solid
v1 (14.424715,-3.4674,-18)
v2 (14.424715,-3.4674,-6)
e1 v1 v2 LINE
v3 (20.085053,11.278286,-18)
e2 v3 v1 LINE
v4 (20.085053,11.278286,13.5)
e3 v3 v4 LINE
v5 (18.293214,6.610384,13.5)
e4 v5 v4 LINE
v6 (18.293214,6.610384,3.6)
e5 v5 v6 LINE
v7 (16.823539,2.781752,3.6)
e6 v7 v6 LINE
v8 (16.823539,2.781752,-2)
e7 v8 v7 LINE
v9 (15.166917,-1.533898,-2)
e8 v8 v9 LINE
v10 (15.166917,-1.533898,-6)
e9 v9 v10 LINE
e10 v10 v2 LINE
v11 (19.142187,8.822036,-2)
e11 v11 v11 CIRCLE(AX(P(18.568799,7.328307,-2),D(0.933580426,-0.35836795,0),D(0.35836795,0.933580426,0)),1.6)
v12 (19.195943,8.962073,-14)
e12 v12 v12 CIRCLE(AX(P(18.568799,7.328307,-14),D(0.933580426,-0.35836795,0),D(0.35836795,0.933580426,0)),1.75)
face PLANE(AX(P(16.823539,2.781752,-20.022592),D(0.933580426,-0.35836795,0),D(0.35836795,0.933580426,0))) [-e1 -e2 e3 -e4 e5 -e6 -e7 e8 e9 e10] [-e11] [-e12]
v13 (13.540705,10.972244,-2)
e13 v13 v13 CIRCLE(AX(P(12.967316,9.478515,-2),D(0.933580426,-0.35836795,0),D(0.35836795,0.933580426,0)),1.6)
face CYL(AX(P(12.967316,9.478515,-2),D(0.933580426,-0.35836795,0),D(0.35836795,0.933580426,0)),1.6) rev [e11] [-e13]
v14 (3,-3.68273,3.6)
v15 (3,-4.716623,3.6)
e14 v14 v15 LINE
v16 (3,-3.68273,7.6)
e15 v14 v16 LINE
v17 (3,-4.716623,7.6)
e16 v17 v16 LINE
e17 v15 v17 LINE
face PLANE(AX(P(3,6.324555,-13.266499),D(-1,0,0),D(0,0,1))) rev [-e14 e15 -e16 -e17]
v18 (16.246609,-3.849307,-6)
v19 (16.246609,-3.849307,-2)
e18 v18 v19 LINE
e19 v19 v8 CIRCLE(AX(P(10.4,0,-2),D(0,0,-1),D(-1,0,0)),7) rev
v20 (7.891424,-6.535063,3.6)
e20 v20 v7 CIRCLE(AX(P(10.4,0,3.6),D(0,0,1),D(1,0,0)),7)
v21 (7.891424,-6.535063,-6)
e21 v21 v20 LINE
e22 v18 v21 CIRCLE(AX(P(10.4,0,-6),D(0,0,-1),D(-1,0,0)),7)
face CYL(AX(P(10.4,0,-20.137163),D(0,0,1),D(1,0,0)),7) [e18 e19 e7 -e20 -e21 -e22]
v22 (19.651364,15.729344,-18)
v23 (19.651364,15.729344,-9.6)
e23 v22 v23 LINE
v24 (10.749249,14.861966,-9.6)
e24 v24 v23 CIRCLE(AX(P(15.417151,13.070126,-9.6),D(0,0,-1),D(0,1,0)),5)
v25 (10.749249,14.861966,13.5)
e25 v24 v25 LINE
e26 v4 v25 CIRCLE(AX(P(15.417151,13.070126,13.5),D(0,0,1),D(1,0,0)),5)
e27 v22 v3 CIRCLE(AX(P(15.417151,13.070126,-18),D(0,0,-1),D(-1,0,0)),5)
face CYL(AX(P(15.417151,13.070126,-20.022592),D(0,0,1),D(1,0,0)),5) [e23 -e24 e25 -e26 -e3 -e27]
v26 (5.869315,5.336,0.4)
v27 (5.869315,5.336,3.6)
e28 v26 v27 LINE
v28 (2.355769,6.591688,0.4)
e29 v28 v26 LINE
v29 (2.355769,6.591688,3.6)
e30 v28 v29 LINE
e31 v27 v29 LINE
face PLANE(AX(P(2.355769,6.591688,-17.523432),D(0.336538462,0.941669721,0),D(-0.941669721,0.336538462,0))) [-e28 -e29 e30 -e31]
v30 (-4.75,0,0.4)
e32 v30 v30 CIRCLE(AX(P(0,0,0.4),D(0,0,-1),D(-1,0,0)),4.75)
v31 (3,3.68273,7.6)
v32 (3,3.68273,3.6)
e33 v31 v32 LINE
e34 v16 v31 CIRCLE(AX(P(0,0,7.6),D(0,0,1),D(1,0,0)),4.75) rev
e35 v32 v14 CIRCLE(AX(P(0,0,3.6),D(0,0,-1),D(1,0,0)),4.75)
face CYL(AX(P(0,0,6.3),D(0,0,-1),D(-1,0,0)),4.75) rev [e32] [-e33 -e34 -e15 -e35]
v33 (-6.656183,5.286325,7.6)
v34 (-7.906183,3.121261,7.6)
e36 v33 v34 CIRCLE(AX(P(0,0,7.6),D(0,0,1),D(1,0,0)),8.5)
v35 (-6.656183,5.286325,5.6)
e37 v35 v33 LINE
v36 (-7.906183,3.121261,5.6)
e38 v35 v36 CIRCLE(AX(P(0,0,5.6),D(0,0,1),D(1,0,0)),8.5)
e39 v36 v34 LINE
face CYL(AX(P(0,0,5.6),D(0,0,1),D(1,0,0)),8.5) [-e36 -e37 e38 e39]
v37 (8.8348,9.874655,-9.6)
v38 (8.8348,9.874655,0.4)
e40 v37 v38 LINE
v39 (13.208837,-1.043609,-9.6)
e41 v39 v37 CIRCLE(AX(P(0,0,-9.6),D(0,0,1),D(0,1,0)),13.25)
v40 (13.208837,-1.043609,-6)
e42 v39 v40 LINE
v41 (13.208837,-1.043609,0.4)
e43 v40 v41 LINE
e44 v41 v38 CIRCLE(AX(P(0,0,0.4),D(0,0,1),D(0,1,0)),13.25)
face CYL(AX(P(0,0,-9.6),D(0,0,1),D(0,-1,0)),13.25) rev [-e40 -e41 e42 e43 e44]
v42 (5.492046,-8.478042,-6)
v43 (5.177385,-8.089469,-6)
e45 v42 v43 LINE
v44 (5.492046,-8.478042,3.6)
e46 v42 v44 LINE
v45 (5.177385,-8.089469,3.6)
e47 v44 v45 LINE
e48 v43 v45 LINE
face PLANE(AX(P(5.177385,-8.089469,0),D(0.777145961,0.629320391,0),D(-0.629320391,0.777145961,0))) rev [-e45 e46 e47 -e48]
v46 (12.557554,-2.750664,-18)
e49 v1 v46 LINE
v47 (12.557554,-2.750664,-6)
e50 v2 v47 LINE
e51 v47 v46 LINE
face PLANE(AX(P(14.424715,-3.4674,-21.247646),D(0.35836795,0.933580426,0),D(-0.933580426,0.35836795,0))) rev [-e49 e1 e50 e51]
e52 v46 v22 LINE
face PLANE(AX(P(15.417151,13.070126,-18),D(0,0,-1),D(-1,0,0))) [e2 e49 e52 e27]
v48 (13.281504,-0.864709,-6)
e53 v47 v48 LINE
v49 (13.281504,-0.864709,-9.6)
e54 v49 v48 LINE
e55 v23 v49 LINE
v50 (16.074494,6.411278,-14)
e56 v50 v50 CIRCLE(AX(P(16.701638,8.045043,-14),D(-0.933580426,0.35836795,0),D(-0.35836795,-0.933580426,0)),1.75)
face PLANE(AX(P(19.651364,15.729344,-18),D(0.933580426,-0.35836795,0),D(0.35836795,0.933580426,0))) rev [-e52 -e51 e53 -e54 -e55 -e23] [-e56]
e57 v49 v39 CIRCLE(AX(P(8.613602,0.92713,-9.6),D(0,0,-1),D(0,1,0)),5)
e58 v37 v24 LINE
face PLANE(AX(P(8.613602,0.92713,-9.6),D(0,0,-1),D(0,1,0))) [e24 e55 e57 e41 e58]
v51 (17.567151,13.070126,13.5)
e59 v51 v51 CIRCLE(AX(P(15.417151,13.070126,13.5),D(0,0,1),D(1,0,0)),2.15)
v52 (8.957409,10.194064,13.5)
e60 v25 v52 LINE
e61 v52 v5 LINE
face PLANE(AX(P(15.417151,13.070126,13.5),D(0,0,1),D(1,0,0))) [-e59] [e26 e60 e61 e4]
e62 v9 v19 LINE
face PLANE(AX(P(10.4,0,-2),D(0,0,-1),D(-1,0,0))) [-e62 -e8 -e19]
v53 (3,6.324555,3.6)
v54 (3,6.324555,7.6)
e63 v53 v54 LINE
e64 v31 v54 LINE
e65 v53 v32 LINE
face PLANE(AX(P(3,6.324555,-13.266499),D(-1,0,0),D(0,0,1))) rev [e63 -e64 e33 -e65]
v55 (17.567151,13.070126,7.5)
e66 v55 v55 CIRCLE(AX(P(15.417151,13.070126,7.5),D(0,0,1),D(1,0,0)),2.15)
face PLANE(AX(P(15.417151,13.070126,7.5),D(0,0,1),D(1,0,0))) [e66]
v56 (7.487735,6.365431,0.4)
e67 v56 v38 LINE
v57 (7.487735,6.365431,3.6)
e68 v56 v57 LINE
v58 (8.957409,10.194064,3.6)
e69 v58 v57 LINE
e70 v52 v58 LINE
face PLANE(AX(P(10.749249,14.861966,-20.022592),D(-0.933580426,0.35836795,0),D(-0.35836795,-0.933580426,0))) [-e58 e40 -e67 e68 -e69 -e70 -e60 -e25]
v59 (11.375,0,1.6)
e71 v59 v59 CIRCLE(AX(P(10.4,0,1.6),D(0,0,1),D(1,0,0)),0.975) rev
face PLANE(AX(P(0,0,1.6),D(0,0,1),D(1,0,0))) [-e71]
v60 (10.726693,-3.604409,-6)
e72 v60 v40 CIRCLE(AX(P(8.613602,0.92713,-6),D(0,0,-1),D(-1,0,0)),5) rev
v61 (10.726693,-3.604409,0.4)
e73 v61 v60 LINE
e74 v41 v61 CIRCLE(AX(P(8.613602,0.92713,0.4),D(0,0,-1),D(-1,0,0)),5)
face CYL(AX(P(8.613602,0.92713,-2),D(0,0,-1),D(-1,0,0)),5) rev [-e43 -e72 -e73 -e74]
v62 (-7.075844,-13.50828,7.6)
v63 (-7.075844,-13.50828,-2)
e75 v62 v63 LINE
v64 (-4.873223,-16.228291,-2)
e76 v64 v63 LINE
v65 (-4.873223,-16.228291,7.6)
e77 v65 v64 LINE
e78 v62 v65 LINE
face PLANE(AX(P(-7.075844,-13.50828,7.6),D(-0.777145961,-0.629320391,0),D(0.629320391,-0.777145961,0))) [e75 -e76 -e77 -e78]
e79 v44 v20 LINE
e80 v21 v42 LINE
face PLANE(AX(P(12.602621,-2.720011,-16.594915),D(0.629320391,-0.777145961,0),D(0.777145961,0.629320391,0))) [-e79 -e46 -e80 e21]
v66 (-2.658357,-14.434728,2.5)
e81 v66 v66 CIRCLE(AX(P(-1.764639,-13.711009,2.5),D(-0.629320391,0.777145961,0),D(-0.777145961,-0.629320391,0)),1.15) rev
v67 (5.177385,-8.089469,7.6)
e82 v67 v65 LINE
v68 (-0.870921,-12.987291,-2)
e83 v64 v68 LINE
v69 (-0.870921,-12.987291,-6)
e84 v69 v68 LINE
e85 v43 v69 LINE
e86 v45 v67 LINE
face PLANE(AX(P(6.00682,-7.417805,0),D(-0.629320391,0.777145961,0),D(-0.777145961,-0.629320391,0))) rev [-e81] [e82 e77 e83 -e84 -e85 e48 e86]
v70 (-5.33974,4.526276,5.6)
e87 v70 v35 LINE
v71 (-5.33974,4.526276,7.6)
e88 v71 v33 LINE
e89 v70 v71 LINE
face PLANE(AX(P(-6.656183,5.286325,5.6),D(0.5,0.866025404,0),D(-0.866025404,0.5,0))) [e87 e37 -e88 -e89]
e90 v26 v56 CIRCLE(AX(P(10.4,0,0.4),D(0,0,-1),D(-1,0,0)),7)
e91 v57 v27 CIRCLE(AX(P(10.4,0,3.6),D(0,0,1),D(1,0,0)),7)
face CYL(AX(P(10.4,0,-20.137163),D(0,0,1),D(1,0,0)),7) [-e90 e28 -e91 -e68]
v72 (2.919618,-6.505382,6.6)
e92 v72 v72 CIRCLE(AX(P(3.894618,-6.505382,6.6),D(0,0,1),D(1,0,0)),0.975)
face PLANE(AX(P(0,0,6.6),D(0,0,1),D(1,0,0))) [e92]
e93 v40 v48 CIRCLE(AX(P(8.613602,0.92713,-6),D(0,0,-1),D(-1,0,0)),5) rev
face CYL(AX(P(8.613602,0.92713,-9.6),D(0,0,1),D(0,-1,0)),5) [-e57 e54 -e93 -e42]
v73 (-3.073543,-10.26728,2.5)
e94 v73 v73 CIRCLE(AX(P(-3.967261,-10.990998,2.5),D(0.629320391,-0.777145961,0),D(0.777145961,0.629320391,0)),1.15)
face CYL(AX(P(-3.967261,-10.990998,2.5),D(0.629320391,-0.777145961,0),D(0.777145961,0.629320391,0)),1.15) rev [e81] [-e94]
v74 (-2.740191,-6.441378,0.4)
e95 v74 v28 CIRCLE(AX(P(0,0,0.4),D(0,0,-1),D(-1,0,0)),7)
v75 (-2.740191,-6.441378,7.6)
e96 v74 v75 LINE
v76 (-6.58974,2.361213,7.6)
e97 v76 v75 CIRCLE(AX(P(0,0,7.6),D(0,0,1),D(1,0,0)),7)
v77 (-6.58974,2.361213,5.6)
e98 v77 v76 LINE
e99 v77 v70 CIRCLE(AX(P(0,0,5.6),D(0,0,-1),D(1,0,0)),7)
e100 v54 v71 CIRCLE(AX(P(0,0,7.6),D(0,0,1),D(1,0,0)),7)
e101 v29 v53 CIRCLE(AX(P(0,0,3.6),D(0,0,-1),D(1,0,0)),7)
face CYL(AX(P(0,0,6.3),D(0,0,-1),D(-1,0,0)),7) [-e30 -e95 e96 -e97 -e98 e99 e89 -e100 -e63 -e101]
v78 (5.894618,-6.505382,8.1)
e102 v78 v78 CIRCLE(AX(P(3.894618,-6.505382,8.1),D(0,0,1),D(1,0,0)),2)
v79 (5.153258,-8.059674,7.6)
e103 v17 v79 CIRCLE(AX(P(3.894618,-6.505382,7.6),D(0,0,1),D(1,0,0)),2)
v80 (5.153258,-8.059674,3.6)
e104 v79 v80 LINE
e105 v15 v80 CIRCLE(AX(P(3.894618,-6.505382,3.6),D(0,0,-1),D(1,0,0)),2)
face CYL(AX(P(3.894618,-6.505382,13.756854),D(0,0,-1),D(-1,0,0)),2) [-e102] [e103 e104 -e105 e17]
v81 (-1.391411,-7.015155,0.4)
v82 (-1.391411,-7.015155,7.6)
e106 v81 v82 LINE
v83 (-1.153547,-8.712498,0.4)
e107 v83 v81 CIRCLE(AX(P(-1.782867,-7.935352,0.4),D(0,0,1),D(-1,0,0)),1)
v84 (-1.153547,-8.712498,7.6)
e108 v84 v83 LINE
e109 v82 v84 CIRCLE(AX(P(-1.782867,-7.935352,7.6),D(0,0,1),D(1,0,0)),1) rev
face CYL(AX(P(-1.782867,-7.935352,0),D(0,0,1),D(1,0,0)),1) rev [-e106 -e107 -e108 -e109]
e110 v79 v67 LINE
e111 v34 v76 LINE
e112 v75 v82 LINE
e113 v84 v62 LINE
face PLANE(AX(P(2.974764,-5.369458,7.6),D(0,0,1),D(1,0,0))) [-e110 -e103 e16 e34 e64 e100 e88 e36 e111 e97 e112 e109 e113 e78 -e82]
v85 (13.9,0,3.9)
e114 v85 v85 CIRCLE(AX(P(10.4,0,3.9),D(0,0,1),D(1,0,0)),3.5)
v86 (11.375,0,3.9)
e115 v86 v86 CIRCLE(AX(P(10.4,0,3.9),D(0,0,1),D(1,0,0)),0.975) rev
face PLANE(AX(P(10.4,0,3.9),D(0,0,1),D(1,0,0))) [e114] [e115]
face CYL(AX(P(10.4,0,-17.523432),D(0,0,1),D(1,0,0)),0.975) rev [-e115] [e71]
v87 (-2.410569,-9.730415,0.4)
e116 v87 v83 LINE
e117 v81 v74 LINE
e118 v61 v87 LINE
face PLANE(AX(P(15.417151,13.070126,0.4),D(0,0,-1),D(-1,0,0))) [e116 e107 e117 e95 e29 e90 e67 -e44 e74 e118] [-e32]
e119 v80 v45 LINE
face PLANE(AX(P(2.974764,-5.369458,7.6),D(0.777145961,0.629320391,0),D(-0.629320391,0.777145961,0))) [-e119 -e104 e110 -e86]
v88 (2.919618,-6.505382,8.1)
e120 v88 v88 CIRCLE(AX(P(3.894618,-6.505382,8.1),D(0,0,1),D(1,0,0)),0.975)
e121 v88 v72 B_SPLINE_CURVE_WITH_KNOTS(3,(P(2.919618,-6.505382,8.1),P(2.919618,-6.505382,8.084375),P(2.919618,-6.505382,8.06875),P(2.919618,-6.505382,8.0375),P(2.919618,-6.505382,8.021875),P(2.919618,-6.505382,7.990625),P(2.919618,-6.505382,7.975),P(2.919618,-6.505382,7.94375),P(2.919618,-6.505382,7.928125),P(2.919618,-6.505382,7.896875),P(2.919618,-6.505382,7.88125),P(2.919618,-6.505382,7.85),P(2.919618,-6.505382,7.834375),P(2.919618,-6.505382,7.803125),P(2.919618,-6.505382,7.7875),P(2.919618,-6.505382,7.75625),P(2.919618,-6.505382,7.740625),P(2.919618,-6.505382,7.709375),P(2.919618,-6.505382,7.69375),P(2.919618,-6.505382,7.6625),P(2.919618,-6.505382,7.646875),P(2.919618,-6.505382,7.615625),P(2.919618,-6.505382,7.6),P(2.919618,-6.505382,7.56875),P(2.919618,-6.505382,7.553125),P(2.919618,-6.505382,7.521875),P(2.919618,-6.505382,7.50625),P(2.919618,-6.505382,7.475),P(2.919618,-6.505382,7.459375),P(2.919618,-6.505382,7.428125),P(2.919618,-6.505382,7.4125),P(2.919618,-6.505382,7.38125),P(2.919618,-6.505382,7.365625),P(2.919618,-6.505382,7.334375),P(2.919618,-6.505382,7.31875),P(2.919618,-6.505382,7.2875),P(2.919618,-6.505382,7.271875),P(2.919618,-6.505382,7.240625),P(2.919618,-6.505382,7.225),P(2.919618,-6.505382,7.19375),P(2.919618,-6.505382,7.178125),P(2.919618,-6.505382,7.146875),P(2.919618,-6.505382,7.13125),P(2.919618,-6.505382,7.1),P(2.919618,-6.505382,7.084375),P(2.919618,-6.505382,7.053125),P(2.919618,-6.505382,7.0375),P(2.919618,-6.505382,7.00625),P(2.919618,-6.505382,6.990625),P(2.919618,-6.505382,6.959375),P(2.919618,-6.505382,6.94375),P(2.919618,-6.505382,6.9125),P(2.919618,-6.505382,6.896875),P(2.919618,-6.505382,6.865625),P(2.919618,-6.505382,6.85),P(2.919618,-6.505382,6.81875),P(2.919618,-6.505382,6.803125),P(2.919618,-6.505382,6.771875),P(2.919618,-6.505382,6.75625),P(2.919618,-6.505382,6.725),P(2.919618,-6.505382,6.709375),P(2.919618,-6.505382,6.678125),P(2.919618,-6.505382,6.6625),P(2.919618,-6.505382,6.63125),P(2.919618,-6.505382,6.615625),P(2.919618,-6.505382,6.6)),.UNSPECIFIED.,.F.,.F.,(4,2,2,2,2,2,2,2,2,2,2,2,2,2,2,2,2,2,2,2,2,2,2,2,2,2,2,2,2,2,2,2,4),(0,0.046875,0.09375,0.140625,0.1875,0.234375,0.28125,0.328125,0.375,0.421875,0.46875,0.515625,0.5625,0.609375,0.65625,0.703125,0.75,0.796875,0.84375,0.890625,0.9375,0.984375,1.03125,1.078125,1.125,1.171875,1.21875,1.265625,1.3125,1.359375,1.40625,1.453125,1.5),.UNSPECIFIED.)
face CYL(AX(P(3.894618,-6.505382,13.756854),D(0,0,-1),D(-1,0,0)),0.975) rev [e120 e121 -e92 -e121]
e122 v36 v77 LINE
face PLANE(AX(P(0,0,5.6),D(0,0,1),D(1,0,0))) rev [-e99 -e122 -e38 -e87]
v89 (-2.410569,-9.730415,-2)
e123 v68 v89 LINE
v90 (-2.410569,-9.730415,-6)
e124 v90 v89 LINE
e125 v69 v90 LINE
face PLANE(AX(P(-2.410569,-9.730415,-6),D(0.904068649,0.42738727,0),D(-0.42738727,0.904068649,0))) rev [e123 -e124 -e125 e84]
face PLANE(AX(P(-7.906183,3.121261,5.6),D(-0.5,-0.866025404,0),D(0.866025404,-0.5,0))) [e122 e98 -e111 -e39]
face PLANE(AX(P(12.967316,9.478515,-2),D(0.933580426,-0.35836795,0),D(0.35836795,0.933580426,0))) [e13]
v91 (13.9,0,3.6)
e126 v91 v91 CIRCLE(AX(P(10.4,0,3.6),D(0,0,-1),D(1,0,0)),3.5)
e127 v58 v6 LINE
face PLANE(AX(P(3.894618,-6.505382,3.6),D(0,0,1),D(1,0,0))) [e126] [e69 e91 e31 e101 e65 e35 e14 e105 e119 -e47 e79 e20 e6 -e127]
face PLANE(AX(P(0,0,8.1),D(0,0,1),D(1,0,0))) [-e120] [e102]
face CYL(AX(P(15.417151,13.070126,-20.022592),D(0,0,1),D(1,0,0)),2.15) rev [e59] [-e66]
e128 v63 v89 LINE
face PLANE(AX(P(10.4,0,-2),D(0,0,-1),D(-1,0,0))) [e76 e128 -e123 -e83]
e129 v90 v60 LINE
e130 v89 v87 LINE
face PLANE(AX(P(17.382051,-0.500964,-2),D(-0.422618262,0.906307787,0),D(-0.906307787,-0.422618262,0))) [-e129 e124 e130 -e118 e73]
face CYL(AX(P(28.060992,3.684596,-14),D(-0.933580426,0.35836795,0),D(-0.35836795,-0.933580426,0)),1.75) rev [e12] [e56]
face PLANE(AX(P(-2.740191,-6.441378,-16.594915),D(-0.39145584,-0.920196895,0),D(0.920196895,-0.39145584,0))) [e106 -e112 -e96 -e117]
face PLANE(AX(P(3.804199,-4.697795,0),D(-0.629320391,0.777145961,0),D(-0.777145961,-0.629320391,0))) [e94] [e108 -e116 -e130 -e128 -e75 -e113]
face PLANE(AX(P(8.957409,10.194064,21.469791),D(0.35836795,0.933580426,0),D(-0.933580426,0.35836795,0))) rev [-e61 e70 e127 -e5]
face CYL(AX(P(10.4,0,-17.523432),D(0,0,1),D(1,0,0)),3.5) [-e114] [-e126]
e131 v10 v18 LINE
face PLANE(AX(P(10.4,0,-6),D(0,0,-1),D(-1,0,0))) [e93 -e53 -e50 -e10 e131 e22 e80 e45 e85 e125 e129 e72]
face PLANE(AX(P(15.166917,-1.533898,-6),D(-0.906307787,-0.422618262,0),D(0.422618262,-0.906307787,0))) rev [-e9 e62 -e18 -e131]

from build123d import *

# Parameters (mm, degrees)
SKETCH_1_R                  = 7
SKETCH_1_R_2                = 4.75
EXTRUDE_1_DEPTH             = 6.3
SKETCH_2_R                  = 7
SKETCH_2_R_2                = 2
EXTRUDE_2_DEPTH             = 1.8
CUT_EXTRUDE_START           = -4
CUT_EXTRUDE_1_DEPTH         = 4
EXTRUDE_START               = -4.1
SKETCH_4_R                  = 0.975
EXTRUDE_3_DEPTH             = 4.1
EXTRUDE_4_REACH             = 18.094
SKETCH_5_R                  = 2
SKETCH_5_R_2                = 0.975
EXTRUDE_4_DIRECTION_2_REACH = 18.094
SKETCH_6_R                  = 0.975
EXTRUDE_5_DEPTH             = 6.6
SKETCH_7_R                  = 0.975
EXTRUDE_6_DEPTH             = 1.6
EXTRUDE_7_DEPTH             = 4.1
EXTRUDE_START_2             = 2
EXTRUDE_8_DEPTH             = 2
CUT_EXTRUDE_2_DEPTH         = 19.287742604
EXTRUDE_9_DEPTH             = 4.1
EXTRUDE_10_DEPTH            = 1
EXTRUDE_10_DEPTH_BACK       = 4
SKETCH_12_W                 = 12.932716562
SKETCH_12_H                 = 7.6
SKETCH_12_R                 = 1.15
CUT_EXTRUDE_START_2         = -1.5
SKETCH_13_R                 = 0.975
CUT_EXTRUDE_3_DEPTH         = 1.5
EXTRUDE_12_DEPTH            = 3.5
FILLET_2_R                  = 1
CUT_EXTRUDE_START_3         = -0.5
CUT_EXTRUDE_4_DEPTH         = 0.5
CUT_EXTRUDE_5_DEPTH         = 0.5
EXTRUDE_START_3             = -5.6
EXTRUDE_14_DEPTH            = 5.6
CUT_EXTRUDE_6_DEPTH         = 26.902153922
EXTRUDE_START_4             = -3.6
SKETCH_21_R                 = 2.15
EXTRUDE_15_DEPTH            = 3.6
SKETCH_22_R                 = 5
SKETCH_22_R_2               = 2.15
EXTRUDE_16_DEPTH            = 9.9
EXTRUDE_19_DEPTH            = 2
CUT_EXTRUDE_8_DEPTH         = 31.424324472
CUT_EXTRUDE_9_DEPTH         = 1.5
EXTRUDE_21_DEPTH            = 2
EXTRUDE_22_DEPTH            = 2
EXTRUDE_START_5             = -2
EXTRUDE_23_DEPTH            = 2
EXTRUDE_START_6             = 18
EXTRUDE_24_DEPTH            = 18
SKETCH_37_R                 = 1.75
CUT_EXTRUDE_10_DEPTH        = 36.025431655
CUT_EXTRUDE_11_DEPTH        = 33.670927742
EXTRUDE_26_DEPTH            = 10
EXTRUDE_26_DEPTH_BACK       = 2
CUT_EXTRUDE_12_DEPTH        = 10
EXTRUDE_START_7             = 4
EXTRUDE_27_DEPTH            = 4
CUT_EXTRUDE_START_4         = -0.2
SKETCH_44_R                 = 3.5
CUT_EXTRUDE_13_DEPTH        = 0.2
FILLET_3_R                  = 5
CUT_EXTRUDE_14_DEPTH        = 0.4
EXTRUDE_START_8             = 10
EXTRUDE_28_DEPTH            = 10
EXTRUDE_29_DEPTH            = 6
EXTRUDE_30_DEPTH            = 12
SKETCH_49_R                 = 1.6
CUT_EXTRUDE_15_DEPTH        = 6
SKETCH_50_R                 = 2.15
EXTRUDE_31_DEPTH            = 7.1
EXTRUDE_32_DEPTH            = 9.9
EXTRUDE_33_DEPTH            = 9.9


# Read off the part's stored shape, not the designer's step: 凸台-拉伸14
with BuildPart() as part:
    # 草图1 → 凸台-拉伸1 (new body)
    with BuildSketch(Plane.XY):
        Circle(SKETCH_1_R)
        Circle(SKETCH_1_R_2, mode=Mode.SUBTRACT)
    extrude(amount=EXTRUDE_1_DEPTH)

    # 草图2 → 凸台-拉伸2 (add)
    with BuildSketch(Plane.XY.offset(6.3)):
        Circle(SKETCH_2_R)
        Circle(SKETCH_2_R_2, mode=Mode.SUBTRACT)
    extrude(amount=EXTRUDE_2_DEPTH)

    # 草图3 → 切除-拉伸1 (cut)
    with BuildSketch(Plane.XY.offset(8.1).offset(CUT_EXTRUDE_START)):
        with BuildLine():
            Line((3, 6.32455532), (3, -6.32455532))
            ThreePointArc((3, -6.32455532), (7, 0), (3, 6.32455532))
        make_face()
    extrude(amount=CUT_EXTRUDE_1_DEPTH, mode=Mode.SUBTRACT)

    # 草图4 → 凸台-拉伸3 (add)
    with BuildSketch(Plane.XY.offset(4.1).offset(EXTRUDE_START)):
        with BuildLine():
            Line((2.355769231, 6.591688049), (11.577884615, 3.295844024))
            ThreePointArc((11.577884615, 3.295844024), (13.9, 0), (11.577884615, -3.295844024))
            Line((11.577884615, -3.295844024), (2.355769231, -6.591688049))
            ThreePointArc((2.355769231, -6.591688049), (2.681213529, -6.46614986), (3, -6.32455532))
            ThreePointArc((3, -6.32455532), (7, 0), (3, 6.32455532))
            ThreePointArc((3, 6.32455532), (2.681213529, 6.46614986), (2.355769231, 6.591688049))
        make_face()
        with Locations((10.4, 0)):
            Circle(SKETCH_4_R, mode=Mode.SUBTRACT)
    extrude(amount=EXTRUDE_3_DEPTH)

    # 凸台-拉伸4: up to this face of the body (flat: up to its plane)
    extrude_4_end = Plane(part.part.faces().sort_by_distance((2.827953495, 0, 8.1))[0])
    # 草图5 → 凸台-拉伸4 (add, up to the picked face)
    with BuildSketch(Plane.XY.offset(4.1), mode=Mode.PRIVATE) as extrude_4_sk1:
        with Locations((3.894617613, -6.505382387)):
            Circle(SKETCH_5_R)
        with Locations((3.894617613, -6.505382387)):
            Circle(SKETCH_5_R_2, mode=Mode.SUBTRACT)
    extrude_4_tool1 = split(extrude(extrude_4_sk1.sketch, amount=EXTRUDE_4_REACH, mode=Mode.PRIVATE), bisect_by=extrude_4_end, keep=Keep.BOTH, mode=Mode.PRIVATE)
    add(extrude_4_tool1.solids().sort_by(Axis((1.951186, -6.505382, 4.1), (0, 0, 1)))[0])

    # 凸台-拉伸4 direction 2: up to this face of the body (flat: up to its plane)
    extrude_4_direction_2_end = Plane(part.part.faces().sort_by_distance((-6.748442849, 0, 0))[0])
    # 草图5 → 凸台-拉伸4 direction 2 (add, up to the picked face)
    with BuildSketch(Plane.XY.offset(4.1), mode=Mode.PRIVATE) as extrude_4_direction_2_sk1:
        with Locations((3.894617613, -6.505382387)):
            Circle(SKETCH_5_R)
        with Locations((3.894617613, -6.505382387)):
            Circle(SKETCH_5_R_2, mode=Mode.SUBTRACT)
    extrude_4_direction_2_tool1 = split(extrude(extrude_4_direction_2_sk1.sketch, amount=-EXTRUDE_4_DIRECTION_2_REACH, mode=Mode.PRIVATE), bisect_by=extrude_4_direction_2_end, keep=Keep.BOTH, mode=Mode.PRIVATE)
    add(extrude_4_direction_2_tool1.solids().sort_by(Axis((1.951186, -6.505382, 4.1), (0, 0, -1)))[0])

    # 草图6 → 凸台-拉伸5 (add)
    with BuildSketch(Plane(origin=(0, 0, 0), x_dir=(-1, 0, 0), z_dir=(0, 0, -1))):
        with Locations((-3.894617613, -6.505382387)):
            Circle(SKETCH_6_R)
    extrude(amount=-EXTRUDE_5_DEPTH)

    # 草图7 → 凸台-拉伸6 (add)
    with BuildSketch(Plane(origin=(0, 0, 0), x_dir=(-1, 0, 0), z_dir=(0, 0, -1))):
        with Locations(Location((-10.4, 0, 0), (0, 0, 180))):
            Circle(SKETCH_7_R)
    extrude(amount=-EXTRUDE_6_DEPTH)

    # 草图8 → 凸台-拉伸7 (add)
    with BuildSketch(Plane(origin=(0, 0, 0), x_dir=(-1, 0, 0), z_dir=(0, 0, -1))):
        with BuildLine():
            ThreePointArc((-11.577884615, -3.295844024), (-12.023769403, -3.100543972), (-12.438245142, -2.845269186))
            Line((-12.438245142, -2.845269186), (-5.059329123, -8.131250493))
            ThreePointArc((-5.059329123, -8.131250493), (-5.857511533, -6.888850066), (-5.585595832, -5.437397058))
            Line((-5.585595832, -5.437397058), (-11.577884615, -3.295844024))
        make_face()
        with BuildLine():
            ThreePointArc((-1.907841671, -6.734993701), (-2.348687888, -7.774280052), (-3.282091086, -8.409276096))
            Line((-3.282091086, -8.409276096), (2.143842843, -6.663627981))
            ThreePointArc((2.143842843, -6.663627981), (0.123277755, -6.998914387), (-1.907841671, -6.734993701))
        make_face()
    extrude(amount=-EXTRUDE_7_DEPTH)

    # 草图9 → 凸台-拉伸8 (add)
    with BuildSketch(Plane(origin=(0, 0, 0), x_dir=(-1, 0, 0), z_dir=(0, 0, -1)).offset(EXTRUDE_START_2)):
        with BuildLine():
            Line((-13.893898751, 0.206570848), (-2.122150074, -8.036096313))
            Line((-2.122150074, -8.036096313), (-3.282091086, -8.409276096))
            ThreePointArc((-3.282091086, -8.409276096), (-4.203731868, -8.481350093), (-5.059329123, -8.131250493))
            Line((-5.059329123, -8.131250493), (-12.438245142, -2.845269186))
            ThreePointArc((-12.438245142, -2.845269186), (-13.559048261, -1.50678933), (-13.893898751, 0.206570848))
        make_face()
    extrude(amount=-EXTRUDE_8_DEPTH)

    # 草图10 → 切除-拉伸2 (cut, through all)
    with BuildSketch(Plane(origin=(0, 0, 6.3), x_dir=(-1, 0, 0), z_dir=(0, 0, -1))):
        with BuildLine():
            Line((-3, 3.682729966), (-3, -3.682729966))
            ThreePointArc((-3, -3.682729966), (4.75, 0), (-3, 3.682729966))
        make_face()
    extrude(amount=-CUT_EXTRUDE_2_DEPTH, mode=Mode.SUBTRACT)

    # 草图11 → 凸台-拉伸9 (add)
    with BuildSketch(Plane.XY.offset(4.1).offset(EXTRUDE_START)):
        with BuildLine():
            Line((12.602621369, -2.720010865), (5.492045563, -8.47804162))
            ThreePointArc((5.492045563, -8.47804162), (4.24689632, -9.019156485), (2.900970325, -8.841153259))
            Line((2.900970325, -8.841153259), (-2.740190881, -6.441378264))
            ThreePointArc((-2.740190881, -6.441378264), (-2.444543943, -6.559283872), (-2.143842843, -6.663627981))
            Line((-2.143842843, -6.663627981), (3.282091086, -8.409276096))
            ThreePointArc((3.282091086, -8.409276096), (4.203731868, -8.481350093), (5.059329123, -8.131250493))
            Line((5.059329123, -8.131250493), (12.438245142, -2.845269186))
            ThreePointArc((12.438245142, -2.845269186), (12.521357962, -2.783853516), (12.602621369, -2.720010865))
        make_face()
    extrude(amount=EXTRUDE_9_DEPTH)

    # 草图12 → 凸台-拉伸10 (add, two sides: drawn at the far end of the back side and taken through both)
    with BuildSketch(Plane(origin=(6.321480576, -7.806378389, 0), x_dir=(0.7771459614569697, 0.629320391049839, 0), z_dir=(0.629320391049839, -0.7771459614569697, 0)).offset(-EXTRUDE_10_DEPTH_BACK)):
        with Locations((-7.533641719, 3.8)):
            Rectangle(SKETCH_12_W, SKETCH_12_H)
        with Locations((-10, 2.5)):
            Circle(SKETCH_12_R, mode=Mode.SUBTRACT)
    extrude(amount=EXTRUDE_10_DEPTH + EXTRUDE_10_DEPTH_BACK)

    # 草图13 → 切除-拉伸3 (cut)
    with BuildSketch(Plane.XY.offset(8.1).offset(CUT_EXTRUDE_START_2)):
        with Locations(Location((3.894617613, -6.505382387, 0), (0, 0, 180))):
            Circle(SKETCH_13_R)
    extrude(amount=CUT_EXTRUDE_3_DEPTH, mode=Mode.SUBTRACT)

    # 草图15 → 凸台-拉伸12 (add)
    with BuildSketch(Plane.XY.offset(4.1)):
        with BuildLine():
            Line((-2.740190881, -6.441378264), (0.138688588, -7.666066358))
            Line((0.138688588, -7.666066358), (1.061105347, -6.919107995))
            ThreePointArc((1.061105347, -6.919107995), (-0.872862235, -6.94536619), (-2.740190881, -6.441378264))
        make_face()
    extrude(amount=EXTRUDE_12_DEPTH)

    # 圆角2
    fillet_2_edges = [part.edges().sort_by_distance(p)[0] for p in [
        (0.138688588, -7.666066358, 3.8),
    ]]
    fillet(fillet_2_edges, radius=FILLET_2_R)

    # 草图17 → 切除-拉伸4 (cut)
    with BuildSketch(Plane.XY.offset(8.1).offset(CUT_EXTRUDE_START_3)):
        with BuildLine():
            ThreePointArc((3, -4.716623229), (2.135623001, -5.553574658), (1.907841671, -6.734993701))
            ThreePointArc((1.907841671, -6.734993701), (-6.975649262, 0.583367269), (3, 6.32455532))
            Line((3, 6.32455532), (3, 3.682729966))
            ThreePointArc((3, 3.682729966), (-4.75, 0), (3, -3.682729966))
            Line((3, -3.682729966), (3, -4.716623229))
        make_face()
    extrude(amount=CUT_EXTRUDE_4_DEPTH, mode=Mode.SUBTRACT)

    # 草图18 → 切除-拉伸5 (cut)
    with BuildSketch(Plane.XY.offset(4.1).offset(CUT_EXTRUDE_START_3)):
        with BuildLine():
            Line((5.153258395, -8.05967431), (5.492045563, -8.47804162))
            Line((5.492045563, -8.47804162), (12.602621369, -2.720010865))
            ThreePointArc((12.602621369, -2.720010865), (6.949698174, -0.587722137), (11.577884615, 3.295844024))
            Line((11.577884615, 3.295844024), (2.355769231, 6.591688049))
            ThreePointArc((2.355769231, 6.591688049), (2.681213529, 6.46614986), (3, 6.32455532))
            Line((3, 6.32455532), (3, 3.682729966))
            ThreePointArc((3, 3.682729966), (4.75, 0), (3, -3.682729966))
            Line((3, -3.682729966), (3, -4.716623229))
            ThreePointArc((3, -4.716623229), (5.576023528, -5.422389243), (5.153258395, -8.05967431))
        make_face()
    extrude(amount=CUT_EXTRUDE_5_DEPTH, mode=Mode.SUBTRACT)

    # 凸台-拉伸14 outline → 凸台-拉伸14 (add)
    with BuildSketch(Plane.XY.offset(3.6).offset(EXTRUDE_START_3)):
        with BuildLine():
            ThreePointArc((7.891424353, -6.535062985), (17.300603652, 1.175444274), (5.869315311, 5.336000024))
            Line((5.869315311, 5.336000024), (11.577884615, 3.295844024))
            ThreePointArc((11.577884615, 3.295844024), (13.200409282, 2.09945418), (13.893898751, 0.206570848))
            ThreePointArc((13.893898751, 0.206570848), (13.602156383, -1.412867474), (12.602621369, -2.720010865))
            Line((12.602621369, -2.720010865), (7.891424353, -6.535062985))
        make_face()
    extrude(amount=EXTRUDE_14_DEPTH)

    # 草图20 → 切除-拉伸6 (cut, through all)
    with BuildSketch(Plane(origin=(0, 0, 0), x_dir=(-1, 0, 0), z_dir=(0, 0, -1))):
        with BuildLine():
            Line((-13.893898751, 0.206570848), (-16.985983121, 2.371671633))
            ThreePointArc((-16.985983121, 2.371671633), (-12.203572459, 6.763662202), (-5.869315311, 5.336000024))
            Line((-5.869315311, 5.336000024), (-11.577884615, 3.295844024))
            ThreePointArc((-11.577884615, 3.295844024), (-13.200409282, 2.09945418), (-13.893898751, 0.206570848))
        make_face()
    extrude(amount=CUT_EXTRUDE_6_DEPTH, mode=Mode.SUBTRACT)

    # 草图21 → 凸台-拉伸15 (add)
    with BuildSketch(Plane.XY.offset(3.6).offset(EXTRUDE_START_4)):
        with BuildLine():
            Line((10.749249161, 14.861965719), (7.487735101, 6.365431105))
            ThreePointArc((7.487735101, 6.365431105), (12.908575647, 6.535062985), (16.823539366, 2.78175161))
            Line((16.823539366, 2.78175161), (20.085053426, 11.278286223))
            ThreePointArc((20.085053426, 11.278286223), (17.208991041, 17.738028103), (10.749249161, 14.861965719))
        make_face()
        with Locations((15.417151294, 13.070125971)):
            Circle(SKETCH_21_R, mode=Mode.SUBTRACT)
    extrude(amount=EXTRUDE_15_DEPTH)

    # 草图22 → 凸台-拉伸16 (add)
    with BuildSketch(Plane.XY.offset(3.6)):
        with Locations((15.417151294, 13.070125971)):
            Circle(SKETCH_22_R)
        with Locations((15.417151294, 13.070125971)):
            Circle(SKETCH_22_R_2, mode=Mode.SUBTRACT)
    extrude(amount=EXTRUDE_16_DEPTH)

    # 草图26 → 凸台-拉伸19 (add)
    with BuildSketch(Plane(origin=(0, 0, 0), x_dir=(-1, 0, 0), z_dir=(0, 0, -1)).offset(EXTRUDE_START_2)):
        with BuildLine():
            Line((3.929242493, -17.394009825), (-9.064960772, -6.871511497))
            ThreePointArc((-9.064960772, -6.871511497), (-8.470843908, -6.728919436), (-7.891424353, -6.535062985))
            Line((-7.891424353, -6.535062985), (-12.602621369, -2.720010865))
            ThreePointArc((-12.602621369, -2.720010865), (-12.521357962, -2.783853516), (-12.438245142, -2.845269186))
            Line((-12.438245142, -2.845269186), (-5.059329123, -8.131250493))
            ThreePointArc((-5.059329123, -8.131250493), (-4.203731868, -8.481350093), (-3.282091086, -8.409276096))
            Line((-3.282091086, -8.409276096), (-0.375625113, -7.474198943))
            Line((-0.375625113, -7.474198943), (7.075844448, -13.508280018))
            Line((7.075844448, -13.508280018), (3.929242493, -17.394009825))
        make_face()
    extrude(amount=-EXTRUDE_19_DEPTH)

    # 草图29 → 切除-拉伸8 (cut, through all)
    with BuildSketch(Plane(origin=(0, 0, 0), x_dir=(-1, 0, 0), z_dir=(0, 0, -1))):
        with BuildLine():
            Line((-17.382050899, -0.500964319), (-3.914897366, -6.780801145))
            Line((-3.914897366, -6.780801145), (-16.985983121, 2.371671633))
            ThreePointArc((-16.985983121, 2.371671633), (-17.334399478, 0.956087801), (-17.382050899, -0.500964319))
        make_face()
    extrude(amount=CUT_EXTRUDE_8_DEPTH, mode=Mode.SUBTRACT)

    # 草图32 → 切除-拉伸9 (cut)
    with BuildSketch(Plane(origin=(6.950800967, -8.58352435, 0), x_dir=(0.7771459614569697, 0.6293203910498391, 0), z_dir=(0.6293203910498391, -0.7771459614569698, 0))):
        Polygon((-1.067283438, 0), (-1.067283438, 7.6), (-14, 7.6), (-14, -2), (2.720415352, -2), (2.720415352, 0), align=None)
    extrude(amount=-CUT_EXTRUDE_9_DEPTH, mode=Mode.SUBTRACT)

    # 草图30 → 凸台-拉伸21 (add)
    with BuildSketch(Plane(origin=(0, 0, -2), x_dir=(-1, 0, 0), z_dir=(0, 0, -1))):
        Polygon((-3.914897366, -6.780801145), (-1.590034558, -7.864902477), (-2.122150074, -8.036096313), align=None)
    extrude(amount=-EXTRUDE_21_DEPTH)

    # 草图33 → 凸台-拉伸22 (add)
    with BuildSketch(Plane(origin=(0, 0, 0), x_dir=(-1, 0, 0), z_dir=(0, 0, -1)).offset(EXTRUDE_START_2)):
        with BuildLine():
            Line((-7.891424353, -6.535062985), (-5.492045563, -8.47804162))
            Line((-5.492045563, -8.47804162), (-5.177385367, -8.089468639))
            Line((-5.177385367, -8.089468639), (-8.120980185, -5.705792555))
            Line((-8.120980185, -5.705792555), (-9.064960772, -6.871511497))
            ThreePointArc((-9.064960772, -6.871511497), (-8.470843908, -6.728919436), (-7.891424353, -6.535062985))
        make_face()
    extrude(amount=-EXTRUDE_22_DEPTH)

    # 草图34 → 凸台-拉伸23 (add)
    with BuildSketch(Plane.XY.offset(7.6).offset(EXTRUDE_START_5)):
        with BuildLine():
            Line((-6.65618294, 5.286324685), (-5.339740145, 4.526276083))
            ThreePointArc((-5.339740145, 4.526276083), (-6.062177826, 3.5), (-6.589740145, 2.361212574))
            Line((-6.589740145, 2.361212574), (-7.90618294, 3.121261175))
            ThreePointArc((-7.90618294, 3.121261175), (-7.361215932, 4.25), (-6.65618294, 5.286324685))
        make_face()
    extrude(amount=EXTRUDE_23_DEPTH)

    # 草图36 → 凸台-拉伸24 (add)
    with BuildSketch(Plane(origin=(0, 0, 0), x_dir=(-1, 0, 0), z_dir=(0, 0, -1)).offset(EXTRUDE_START_6)):
        with BuildLine():
            Line((-19.651364371, 15.729343828), (-15.350948977, 4.52637871))
            Line((-15.350948977, 4.52637871), (-17.21810983, 3.809642811))
            Line((-17.21810983, 3.809642811), (-20.085053426, 11.278286223))
            ThreePointArc((-20.085053426, 11.278286223), (-20.393584982, 13.555005075), (-19.651364371, 15.729343828))
        make_face()
    extrude(amount=-EXTRUDE_24_DEPTH)

    # 草图37 → 切除-拉伸10 (cut, through all)
    with BuildSketch(Plane(origin=(11.865094372, -4.554583002, 0), x_dir=(0.35836794954529744, 0.933580426497203, 0), z_dir=(-0.933580426497203, 0.35836794954529744, 0))):
        with Locations(Location((13.496026675, 14, 0), (0, 0, 180))):
            Circle(SKETCH_37_R)
    extrude(amount=-CUT_EXTRUDE_10_DEPTH, mode=Mode.SUBTRACT)

    # 草图39 → 切除-拉伸11 (cut, through all)
    with BuildSketch(Plane(origin=(0, 0, 0), x_dir=(-1, 0, 0), z_dir=(0, 0, -1))):
        Polygon((-1.590034558, -7.864902477), (2.410569302, -9.730414694), (-0.375625113, -7.474198943), align=None)
    extrude(amount=CUT_EXTRUDE_11_DEPTH, mode=Mode.SUBTRACT)

    # 草图40 → 凸台-拉伸26 (add, two sides: drawn at the far end of the back side and taken through both)
    with BuildSketch(Plane(origin=(0, 0, -2), x_dir=(-1, 0, 0), z_dir=(0, 0, -1)).offset(-EXTRUDE_26_DEPTH_BACK)):
        with BuildLine():
            Line((-17.382050899, -0.500964319), (-12.557553919, -2.750664208))
            Line((-12.557553919, -2.750664208), (-15.350948977, 4.52637871))
            Line((-15.350948977, 4.52637871), (-17.21810983, 3.809642811))
            Line((-17.21810983, 3.809642811), (-16.823539366, 2.78175161))
            ThreePointArc((-16.823539366, 2.78175161), (-17.300834627, 1.174087496), (-17.382050899, -0.500964319))
        make_face()
    extrude(amount=EXTRUDE_26_DEPTH + EXTRUDE_26_DEPTH_BACK)

    # 草图42 → 切除-拉伸12 (cut)
    with BuildSketch(Plane(origin=(0, 0, -12), x_dir=(-1, 0, 0), z_dir=(0, 0, -1))):
        with BuildLine():
            Line((-16.823539366, 2.78175161), (-15.166916523, -1.533898443))
            Line((-15.166916523, -1.533898443), (-17.382050899, -0.500964319))
            ThreePointArc((-17.382050899, -0.500964319), (-17.300834627, 1.174087496), (-16.823539366, 2.78175161))
        make_face()
    extrude(amount=-CUT_EXTRUDE_12_DEPTH, mode=Mode.SUBTRACT)

    # 草图43 → 凸台-拉伸27 (add)
    with BuildSketch(Plane(origin=(0, 0, -2), x_dir=(-1, 0, 0), z_dir=(0, 0, -1)).offset(EXTRUDE_START_7)):
        with BuildLine():
            Line((-15.166916523, -1.533898443), (2.410569302, -9.730414694))
            Line((2.410569302, -9.730414694), (0.870921378, -12.987290869))
            Line((0.870921378, -12.987290869), (-5.177385367, -8.089468639))
            Line((-5.177385367, -8.089468639), (-5.492045563, -8.47804162))
            Line((-5.492045563, -8.47804162), (-7.891424353, -6.535062985))
            ThreePointArc((-7.891424353, -6.535062985), (-12.542180804, -6.664162468), (-16.246609113, -3.849306675))
            Line((-16.246609113, -3.849306675), (-15.166916523, -1.533898443))
        make_face()
    extrude(amount=-EXTRUDE_27_DEPTH)

    # 草图44 → 切除-拉伸13 (cut)
    with BuildSketch(Plane.XY.offset(4.1).offset(CUT_EXTRUDE_START_4)):
        with Locations((10.4, 0)):
            Circle(SKETCH_44_R)
    extrude(amount=CUT_EXTRUDE_13_DEPTH, mode=Mode.SUBTRACT)

    # 圆角3
    fillet_3_edges = [part.edges().sort_by_distance(p)[0] for p in [
        (12.557553919, -2.750664208, -3),
    ]]
    fillet(fillet_3_edges, radius=FILLET_3_R)

    # 草图45 → 切除-拉伸14 (cut)
    with BuildSketch(Plane(origin=(0, 0, 0), x_dir=(-1, 0, 0), z_dir=(0, 0, -1))):
        with BuildLine():
            Line((-19.651364371, 15.729343828), (-13.28150417, -0.864709327))
            ThreePointArc((-13.28150417, -0.864709327), (-12.270370545, -2.482861379), (-10.726693346, -3.604408514))
            Line((-10.726693346, -3.604408514), (2.410569302, -9.730414694))
            Line((2.410569302, -9.730414694), (1.153546777, -8.712497924))
            ThreePointArc((1.153546777, -8.712497924), (0.792544381, -7.796568755), (1.391411328, -7.015155068))
            Line((1.391411328, -7.015155068), (2.740190881, -6.441378264))
            ThreePointArc((2.740190881, -6.441378264), (6.519367253, 2.549088195), (-2.355769231, 6.591688049))
            Line((-2.355769231, 6.591688049), (-5.869315311, 5.336000024))
            ThreePointArc((-5.869315311, 5.336000024), (-6.643098786, 5.906411201), (-7.487735101, 6.365431105))
            Line((-7.487735101, 6.365431105), (-10.749249161, 14.861965719))
            ThreePointArc((-10.749249161, 14.861965719), (-14.93227219, 18.046559659), (-19.651364371, 15.729343828))
        make_face()
    extrude(amount=-CUT_EXTRUDE_14_DEPTH, mode=Mode.SUBTRACT)

    # 草图46 → 凸台-拉伸28 (add)
    with BuildSketch(Plane(origin=(0, 0, 0.4), x_dir=(-1, 0, 0), z_dir=(0, 0, -1)).offset(EXTRUDE_START_8)):
        with BuildLine():
            Line((-19.651364371, 15.729343828), (-13.28150417, -0.864709327))
            ThreePointArc((-13.28150417, -0.864709327), (-13.246034382, -0.954509971), (-13.208837205, -1.04360897))
            ThreePointArc((-13.208837205, -1.04360897), (-12.299699436, 4.927463221), (-8.834799924, 9.874654946))
            Line((-8.834799924, 9.874654946), (-10.749249161, 14.861965719))
            ThreePointArc((-10.749249161, 14.861965719), (-14.93227219, 18.046559659), (-19.651364371, 15.729343828))
        make_face()
    extrude(amount=-EXTRUDE_28_DEPTH)

    # 草图47 → 凸台-拉伸29 (add)
    with BuildSketch(Plane(origin=(0, 0, -12), x_dir=(-1, 0, 0), z_dir=(0, 0, -1))):
        Polygon((-17.21810983, 3.809642811), (-15.166916523, -1.533898443), (-12.557553919, -2.750664208), (-15.350948977, 4.52637871), align=None)
    extrude(amount=EXTRUDE_29_DEPTH)

    # 草图48 → 凸台-拉伸30 (add)
    with BuildSketch(Plane(origin=(0, 0, -6), x_dir=(-1, 0, 0), z_dir=(0, 0, -1))):
        Polygon((-15.166916523, -1.533898443), (-14.424714772, -3.467400107), (-12.557553919, -2.750664208), align=None)
    extrude(amount=EXTRUDE_30_DEPTH)

    # 草图49 → 切除-拉伸15 (cut)
    with BuildSketch(Plane(origin=(13.732255225, -5.271318901, 0), x_dir=(0, 0, -1), z_dir=(0.9335804264972031, -0.3583679495452971, 0))):
        with Locations(Location((2, 13.496026675, 0), (0, 0, 90))):
            Circle(SKETCH_49_R)
    extrude(amount=-CUT_EXTRUDE_15_DEPTH, mode=Mode.SUBTRACT)

    # 草图50 → 凸台-拉伸31 (add)
    with BuildSketch(Plane.XY.offset(0.4)):
        with Locations((15.417151294, 13.070125971)):
            Circle(SKETCH_50_R)
    extrude(amount=EXTRUDE_31_DEPTH)

    # 草图51 → 凸台-拉伸32 (add)
    with BuildSketch(Plane.XY.offset(3.6)):
        with BuildLine():
            Line((10.749249161, 14.861965719), (8.957409413, 10.194063586))
            Line((8.957409413, 10.194063586), (13.625311546, 8.402223838))
            ThreePointArc((13.625311546, 8.402223838), (10.849424005, 11.036442756), (10.749249161, 14.861965719))
        make_face()
    extrude(amount=EXTRUDE_32_DEPTH)

    # 草图52 → 凸台-拉伸33 (add)
    with BuildSketch(Plane.XY.offset(3.6)):
        with BuildLine():
            Line((20.085053426, 11.278286223), (18.293213678, 6.610384091))
            Line((18.293213678, 6.610384091), (13.625311546, 8.402223838))
            ThreePointArc((13.625311546, 8.402223838), (17.450834509, 8.502398683), (20.085053426, 11.278286223))
        make_face()
    extrude(amount=EXTRUDE_33_DEPTH)


solid = part.part
